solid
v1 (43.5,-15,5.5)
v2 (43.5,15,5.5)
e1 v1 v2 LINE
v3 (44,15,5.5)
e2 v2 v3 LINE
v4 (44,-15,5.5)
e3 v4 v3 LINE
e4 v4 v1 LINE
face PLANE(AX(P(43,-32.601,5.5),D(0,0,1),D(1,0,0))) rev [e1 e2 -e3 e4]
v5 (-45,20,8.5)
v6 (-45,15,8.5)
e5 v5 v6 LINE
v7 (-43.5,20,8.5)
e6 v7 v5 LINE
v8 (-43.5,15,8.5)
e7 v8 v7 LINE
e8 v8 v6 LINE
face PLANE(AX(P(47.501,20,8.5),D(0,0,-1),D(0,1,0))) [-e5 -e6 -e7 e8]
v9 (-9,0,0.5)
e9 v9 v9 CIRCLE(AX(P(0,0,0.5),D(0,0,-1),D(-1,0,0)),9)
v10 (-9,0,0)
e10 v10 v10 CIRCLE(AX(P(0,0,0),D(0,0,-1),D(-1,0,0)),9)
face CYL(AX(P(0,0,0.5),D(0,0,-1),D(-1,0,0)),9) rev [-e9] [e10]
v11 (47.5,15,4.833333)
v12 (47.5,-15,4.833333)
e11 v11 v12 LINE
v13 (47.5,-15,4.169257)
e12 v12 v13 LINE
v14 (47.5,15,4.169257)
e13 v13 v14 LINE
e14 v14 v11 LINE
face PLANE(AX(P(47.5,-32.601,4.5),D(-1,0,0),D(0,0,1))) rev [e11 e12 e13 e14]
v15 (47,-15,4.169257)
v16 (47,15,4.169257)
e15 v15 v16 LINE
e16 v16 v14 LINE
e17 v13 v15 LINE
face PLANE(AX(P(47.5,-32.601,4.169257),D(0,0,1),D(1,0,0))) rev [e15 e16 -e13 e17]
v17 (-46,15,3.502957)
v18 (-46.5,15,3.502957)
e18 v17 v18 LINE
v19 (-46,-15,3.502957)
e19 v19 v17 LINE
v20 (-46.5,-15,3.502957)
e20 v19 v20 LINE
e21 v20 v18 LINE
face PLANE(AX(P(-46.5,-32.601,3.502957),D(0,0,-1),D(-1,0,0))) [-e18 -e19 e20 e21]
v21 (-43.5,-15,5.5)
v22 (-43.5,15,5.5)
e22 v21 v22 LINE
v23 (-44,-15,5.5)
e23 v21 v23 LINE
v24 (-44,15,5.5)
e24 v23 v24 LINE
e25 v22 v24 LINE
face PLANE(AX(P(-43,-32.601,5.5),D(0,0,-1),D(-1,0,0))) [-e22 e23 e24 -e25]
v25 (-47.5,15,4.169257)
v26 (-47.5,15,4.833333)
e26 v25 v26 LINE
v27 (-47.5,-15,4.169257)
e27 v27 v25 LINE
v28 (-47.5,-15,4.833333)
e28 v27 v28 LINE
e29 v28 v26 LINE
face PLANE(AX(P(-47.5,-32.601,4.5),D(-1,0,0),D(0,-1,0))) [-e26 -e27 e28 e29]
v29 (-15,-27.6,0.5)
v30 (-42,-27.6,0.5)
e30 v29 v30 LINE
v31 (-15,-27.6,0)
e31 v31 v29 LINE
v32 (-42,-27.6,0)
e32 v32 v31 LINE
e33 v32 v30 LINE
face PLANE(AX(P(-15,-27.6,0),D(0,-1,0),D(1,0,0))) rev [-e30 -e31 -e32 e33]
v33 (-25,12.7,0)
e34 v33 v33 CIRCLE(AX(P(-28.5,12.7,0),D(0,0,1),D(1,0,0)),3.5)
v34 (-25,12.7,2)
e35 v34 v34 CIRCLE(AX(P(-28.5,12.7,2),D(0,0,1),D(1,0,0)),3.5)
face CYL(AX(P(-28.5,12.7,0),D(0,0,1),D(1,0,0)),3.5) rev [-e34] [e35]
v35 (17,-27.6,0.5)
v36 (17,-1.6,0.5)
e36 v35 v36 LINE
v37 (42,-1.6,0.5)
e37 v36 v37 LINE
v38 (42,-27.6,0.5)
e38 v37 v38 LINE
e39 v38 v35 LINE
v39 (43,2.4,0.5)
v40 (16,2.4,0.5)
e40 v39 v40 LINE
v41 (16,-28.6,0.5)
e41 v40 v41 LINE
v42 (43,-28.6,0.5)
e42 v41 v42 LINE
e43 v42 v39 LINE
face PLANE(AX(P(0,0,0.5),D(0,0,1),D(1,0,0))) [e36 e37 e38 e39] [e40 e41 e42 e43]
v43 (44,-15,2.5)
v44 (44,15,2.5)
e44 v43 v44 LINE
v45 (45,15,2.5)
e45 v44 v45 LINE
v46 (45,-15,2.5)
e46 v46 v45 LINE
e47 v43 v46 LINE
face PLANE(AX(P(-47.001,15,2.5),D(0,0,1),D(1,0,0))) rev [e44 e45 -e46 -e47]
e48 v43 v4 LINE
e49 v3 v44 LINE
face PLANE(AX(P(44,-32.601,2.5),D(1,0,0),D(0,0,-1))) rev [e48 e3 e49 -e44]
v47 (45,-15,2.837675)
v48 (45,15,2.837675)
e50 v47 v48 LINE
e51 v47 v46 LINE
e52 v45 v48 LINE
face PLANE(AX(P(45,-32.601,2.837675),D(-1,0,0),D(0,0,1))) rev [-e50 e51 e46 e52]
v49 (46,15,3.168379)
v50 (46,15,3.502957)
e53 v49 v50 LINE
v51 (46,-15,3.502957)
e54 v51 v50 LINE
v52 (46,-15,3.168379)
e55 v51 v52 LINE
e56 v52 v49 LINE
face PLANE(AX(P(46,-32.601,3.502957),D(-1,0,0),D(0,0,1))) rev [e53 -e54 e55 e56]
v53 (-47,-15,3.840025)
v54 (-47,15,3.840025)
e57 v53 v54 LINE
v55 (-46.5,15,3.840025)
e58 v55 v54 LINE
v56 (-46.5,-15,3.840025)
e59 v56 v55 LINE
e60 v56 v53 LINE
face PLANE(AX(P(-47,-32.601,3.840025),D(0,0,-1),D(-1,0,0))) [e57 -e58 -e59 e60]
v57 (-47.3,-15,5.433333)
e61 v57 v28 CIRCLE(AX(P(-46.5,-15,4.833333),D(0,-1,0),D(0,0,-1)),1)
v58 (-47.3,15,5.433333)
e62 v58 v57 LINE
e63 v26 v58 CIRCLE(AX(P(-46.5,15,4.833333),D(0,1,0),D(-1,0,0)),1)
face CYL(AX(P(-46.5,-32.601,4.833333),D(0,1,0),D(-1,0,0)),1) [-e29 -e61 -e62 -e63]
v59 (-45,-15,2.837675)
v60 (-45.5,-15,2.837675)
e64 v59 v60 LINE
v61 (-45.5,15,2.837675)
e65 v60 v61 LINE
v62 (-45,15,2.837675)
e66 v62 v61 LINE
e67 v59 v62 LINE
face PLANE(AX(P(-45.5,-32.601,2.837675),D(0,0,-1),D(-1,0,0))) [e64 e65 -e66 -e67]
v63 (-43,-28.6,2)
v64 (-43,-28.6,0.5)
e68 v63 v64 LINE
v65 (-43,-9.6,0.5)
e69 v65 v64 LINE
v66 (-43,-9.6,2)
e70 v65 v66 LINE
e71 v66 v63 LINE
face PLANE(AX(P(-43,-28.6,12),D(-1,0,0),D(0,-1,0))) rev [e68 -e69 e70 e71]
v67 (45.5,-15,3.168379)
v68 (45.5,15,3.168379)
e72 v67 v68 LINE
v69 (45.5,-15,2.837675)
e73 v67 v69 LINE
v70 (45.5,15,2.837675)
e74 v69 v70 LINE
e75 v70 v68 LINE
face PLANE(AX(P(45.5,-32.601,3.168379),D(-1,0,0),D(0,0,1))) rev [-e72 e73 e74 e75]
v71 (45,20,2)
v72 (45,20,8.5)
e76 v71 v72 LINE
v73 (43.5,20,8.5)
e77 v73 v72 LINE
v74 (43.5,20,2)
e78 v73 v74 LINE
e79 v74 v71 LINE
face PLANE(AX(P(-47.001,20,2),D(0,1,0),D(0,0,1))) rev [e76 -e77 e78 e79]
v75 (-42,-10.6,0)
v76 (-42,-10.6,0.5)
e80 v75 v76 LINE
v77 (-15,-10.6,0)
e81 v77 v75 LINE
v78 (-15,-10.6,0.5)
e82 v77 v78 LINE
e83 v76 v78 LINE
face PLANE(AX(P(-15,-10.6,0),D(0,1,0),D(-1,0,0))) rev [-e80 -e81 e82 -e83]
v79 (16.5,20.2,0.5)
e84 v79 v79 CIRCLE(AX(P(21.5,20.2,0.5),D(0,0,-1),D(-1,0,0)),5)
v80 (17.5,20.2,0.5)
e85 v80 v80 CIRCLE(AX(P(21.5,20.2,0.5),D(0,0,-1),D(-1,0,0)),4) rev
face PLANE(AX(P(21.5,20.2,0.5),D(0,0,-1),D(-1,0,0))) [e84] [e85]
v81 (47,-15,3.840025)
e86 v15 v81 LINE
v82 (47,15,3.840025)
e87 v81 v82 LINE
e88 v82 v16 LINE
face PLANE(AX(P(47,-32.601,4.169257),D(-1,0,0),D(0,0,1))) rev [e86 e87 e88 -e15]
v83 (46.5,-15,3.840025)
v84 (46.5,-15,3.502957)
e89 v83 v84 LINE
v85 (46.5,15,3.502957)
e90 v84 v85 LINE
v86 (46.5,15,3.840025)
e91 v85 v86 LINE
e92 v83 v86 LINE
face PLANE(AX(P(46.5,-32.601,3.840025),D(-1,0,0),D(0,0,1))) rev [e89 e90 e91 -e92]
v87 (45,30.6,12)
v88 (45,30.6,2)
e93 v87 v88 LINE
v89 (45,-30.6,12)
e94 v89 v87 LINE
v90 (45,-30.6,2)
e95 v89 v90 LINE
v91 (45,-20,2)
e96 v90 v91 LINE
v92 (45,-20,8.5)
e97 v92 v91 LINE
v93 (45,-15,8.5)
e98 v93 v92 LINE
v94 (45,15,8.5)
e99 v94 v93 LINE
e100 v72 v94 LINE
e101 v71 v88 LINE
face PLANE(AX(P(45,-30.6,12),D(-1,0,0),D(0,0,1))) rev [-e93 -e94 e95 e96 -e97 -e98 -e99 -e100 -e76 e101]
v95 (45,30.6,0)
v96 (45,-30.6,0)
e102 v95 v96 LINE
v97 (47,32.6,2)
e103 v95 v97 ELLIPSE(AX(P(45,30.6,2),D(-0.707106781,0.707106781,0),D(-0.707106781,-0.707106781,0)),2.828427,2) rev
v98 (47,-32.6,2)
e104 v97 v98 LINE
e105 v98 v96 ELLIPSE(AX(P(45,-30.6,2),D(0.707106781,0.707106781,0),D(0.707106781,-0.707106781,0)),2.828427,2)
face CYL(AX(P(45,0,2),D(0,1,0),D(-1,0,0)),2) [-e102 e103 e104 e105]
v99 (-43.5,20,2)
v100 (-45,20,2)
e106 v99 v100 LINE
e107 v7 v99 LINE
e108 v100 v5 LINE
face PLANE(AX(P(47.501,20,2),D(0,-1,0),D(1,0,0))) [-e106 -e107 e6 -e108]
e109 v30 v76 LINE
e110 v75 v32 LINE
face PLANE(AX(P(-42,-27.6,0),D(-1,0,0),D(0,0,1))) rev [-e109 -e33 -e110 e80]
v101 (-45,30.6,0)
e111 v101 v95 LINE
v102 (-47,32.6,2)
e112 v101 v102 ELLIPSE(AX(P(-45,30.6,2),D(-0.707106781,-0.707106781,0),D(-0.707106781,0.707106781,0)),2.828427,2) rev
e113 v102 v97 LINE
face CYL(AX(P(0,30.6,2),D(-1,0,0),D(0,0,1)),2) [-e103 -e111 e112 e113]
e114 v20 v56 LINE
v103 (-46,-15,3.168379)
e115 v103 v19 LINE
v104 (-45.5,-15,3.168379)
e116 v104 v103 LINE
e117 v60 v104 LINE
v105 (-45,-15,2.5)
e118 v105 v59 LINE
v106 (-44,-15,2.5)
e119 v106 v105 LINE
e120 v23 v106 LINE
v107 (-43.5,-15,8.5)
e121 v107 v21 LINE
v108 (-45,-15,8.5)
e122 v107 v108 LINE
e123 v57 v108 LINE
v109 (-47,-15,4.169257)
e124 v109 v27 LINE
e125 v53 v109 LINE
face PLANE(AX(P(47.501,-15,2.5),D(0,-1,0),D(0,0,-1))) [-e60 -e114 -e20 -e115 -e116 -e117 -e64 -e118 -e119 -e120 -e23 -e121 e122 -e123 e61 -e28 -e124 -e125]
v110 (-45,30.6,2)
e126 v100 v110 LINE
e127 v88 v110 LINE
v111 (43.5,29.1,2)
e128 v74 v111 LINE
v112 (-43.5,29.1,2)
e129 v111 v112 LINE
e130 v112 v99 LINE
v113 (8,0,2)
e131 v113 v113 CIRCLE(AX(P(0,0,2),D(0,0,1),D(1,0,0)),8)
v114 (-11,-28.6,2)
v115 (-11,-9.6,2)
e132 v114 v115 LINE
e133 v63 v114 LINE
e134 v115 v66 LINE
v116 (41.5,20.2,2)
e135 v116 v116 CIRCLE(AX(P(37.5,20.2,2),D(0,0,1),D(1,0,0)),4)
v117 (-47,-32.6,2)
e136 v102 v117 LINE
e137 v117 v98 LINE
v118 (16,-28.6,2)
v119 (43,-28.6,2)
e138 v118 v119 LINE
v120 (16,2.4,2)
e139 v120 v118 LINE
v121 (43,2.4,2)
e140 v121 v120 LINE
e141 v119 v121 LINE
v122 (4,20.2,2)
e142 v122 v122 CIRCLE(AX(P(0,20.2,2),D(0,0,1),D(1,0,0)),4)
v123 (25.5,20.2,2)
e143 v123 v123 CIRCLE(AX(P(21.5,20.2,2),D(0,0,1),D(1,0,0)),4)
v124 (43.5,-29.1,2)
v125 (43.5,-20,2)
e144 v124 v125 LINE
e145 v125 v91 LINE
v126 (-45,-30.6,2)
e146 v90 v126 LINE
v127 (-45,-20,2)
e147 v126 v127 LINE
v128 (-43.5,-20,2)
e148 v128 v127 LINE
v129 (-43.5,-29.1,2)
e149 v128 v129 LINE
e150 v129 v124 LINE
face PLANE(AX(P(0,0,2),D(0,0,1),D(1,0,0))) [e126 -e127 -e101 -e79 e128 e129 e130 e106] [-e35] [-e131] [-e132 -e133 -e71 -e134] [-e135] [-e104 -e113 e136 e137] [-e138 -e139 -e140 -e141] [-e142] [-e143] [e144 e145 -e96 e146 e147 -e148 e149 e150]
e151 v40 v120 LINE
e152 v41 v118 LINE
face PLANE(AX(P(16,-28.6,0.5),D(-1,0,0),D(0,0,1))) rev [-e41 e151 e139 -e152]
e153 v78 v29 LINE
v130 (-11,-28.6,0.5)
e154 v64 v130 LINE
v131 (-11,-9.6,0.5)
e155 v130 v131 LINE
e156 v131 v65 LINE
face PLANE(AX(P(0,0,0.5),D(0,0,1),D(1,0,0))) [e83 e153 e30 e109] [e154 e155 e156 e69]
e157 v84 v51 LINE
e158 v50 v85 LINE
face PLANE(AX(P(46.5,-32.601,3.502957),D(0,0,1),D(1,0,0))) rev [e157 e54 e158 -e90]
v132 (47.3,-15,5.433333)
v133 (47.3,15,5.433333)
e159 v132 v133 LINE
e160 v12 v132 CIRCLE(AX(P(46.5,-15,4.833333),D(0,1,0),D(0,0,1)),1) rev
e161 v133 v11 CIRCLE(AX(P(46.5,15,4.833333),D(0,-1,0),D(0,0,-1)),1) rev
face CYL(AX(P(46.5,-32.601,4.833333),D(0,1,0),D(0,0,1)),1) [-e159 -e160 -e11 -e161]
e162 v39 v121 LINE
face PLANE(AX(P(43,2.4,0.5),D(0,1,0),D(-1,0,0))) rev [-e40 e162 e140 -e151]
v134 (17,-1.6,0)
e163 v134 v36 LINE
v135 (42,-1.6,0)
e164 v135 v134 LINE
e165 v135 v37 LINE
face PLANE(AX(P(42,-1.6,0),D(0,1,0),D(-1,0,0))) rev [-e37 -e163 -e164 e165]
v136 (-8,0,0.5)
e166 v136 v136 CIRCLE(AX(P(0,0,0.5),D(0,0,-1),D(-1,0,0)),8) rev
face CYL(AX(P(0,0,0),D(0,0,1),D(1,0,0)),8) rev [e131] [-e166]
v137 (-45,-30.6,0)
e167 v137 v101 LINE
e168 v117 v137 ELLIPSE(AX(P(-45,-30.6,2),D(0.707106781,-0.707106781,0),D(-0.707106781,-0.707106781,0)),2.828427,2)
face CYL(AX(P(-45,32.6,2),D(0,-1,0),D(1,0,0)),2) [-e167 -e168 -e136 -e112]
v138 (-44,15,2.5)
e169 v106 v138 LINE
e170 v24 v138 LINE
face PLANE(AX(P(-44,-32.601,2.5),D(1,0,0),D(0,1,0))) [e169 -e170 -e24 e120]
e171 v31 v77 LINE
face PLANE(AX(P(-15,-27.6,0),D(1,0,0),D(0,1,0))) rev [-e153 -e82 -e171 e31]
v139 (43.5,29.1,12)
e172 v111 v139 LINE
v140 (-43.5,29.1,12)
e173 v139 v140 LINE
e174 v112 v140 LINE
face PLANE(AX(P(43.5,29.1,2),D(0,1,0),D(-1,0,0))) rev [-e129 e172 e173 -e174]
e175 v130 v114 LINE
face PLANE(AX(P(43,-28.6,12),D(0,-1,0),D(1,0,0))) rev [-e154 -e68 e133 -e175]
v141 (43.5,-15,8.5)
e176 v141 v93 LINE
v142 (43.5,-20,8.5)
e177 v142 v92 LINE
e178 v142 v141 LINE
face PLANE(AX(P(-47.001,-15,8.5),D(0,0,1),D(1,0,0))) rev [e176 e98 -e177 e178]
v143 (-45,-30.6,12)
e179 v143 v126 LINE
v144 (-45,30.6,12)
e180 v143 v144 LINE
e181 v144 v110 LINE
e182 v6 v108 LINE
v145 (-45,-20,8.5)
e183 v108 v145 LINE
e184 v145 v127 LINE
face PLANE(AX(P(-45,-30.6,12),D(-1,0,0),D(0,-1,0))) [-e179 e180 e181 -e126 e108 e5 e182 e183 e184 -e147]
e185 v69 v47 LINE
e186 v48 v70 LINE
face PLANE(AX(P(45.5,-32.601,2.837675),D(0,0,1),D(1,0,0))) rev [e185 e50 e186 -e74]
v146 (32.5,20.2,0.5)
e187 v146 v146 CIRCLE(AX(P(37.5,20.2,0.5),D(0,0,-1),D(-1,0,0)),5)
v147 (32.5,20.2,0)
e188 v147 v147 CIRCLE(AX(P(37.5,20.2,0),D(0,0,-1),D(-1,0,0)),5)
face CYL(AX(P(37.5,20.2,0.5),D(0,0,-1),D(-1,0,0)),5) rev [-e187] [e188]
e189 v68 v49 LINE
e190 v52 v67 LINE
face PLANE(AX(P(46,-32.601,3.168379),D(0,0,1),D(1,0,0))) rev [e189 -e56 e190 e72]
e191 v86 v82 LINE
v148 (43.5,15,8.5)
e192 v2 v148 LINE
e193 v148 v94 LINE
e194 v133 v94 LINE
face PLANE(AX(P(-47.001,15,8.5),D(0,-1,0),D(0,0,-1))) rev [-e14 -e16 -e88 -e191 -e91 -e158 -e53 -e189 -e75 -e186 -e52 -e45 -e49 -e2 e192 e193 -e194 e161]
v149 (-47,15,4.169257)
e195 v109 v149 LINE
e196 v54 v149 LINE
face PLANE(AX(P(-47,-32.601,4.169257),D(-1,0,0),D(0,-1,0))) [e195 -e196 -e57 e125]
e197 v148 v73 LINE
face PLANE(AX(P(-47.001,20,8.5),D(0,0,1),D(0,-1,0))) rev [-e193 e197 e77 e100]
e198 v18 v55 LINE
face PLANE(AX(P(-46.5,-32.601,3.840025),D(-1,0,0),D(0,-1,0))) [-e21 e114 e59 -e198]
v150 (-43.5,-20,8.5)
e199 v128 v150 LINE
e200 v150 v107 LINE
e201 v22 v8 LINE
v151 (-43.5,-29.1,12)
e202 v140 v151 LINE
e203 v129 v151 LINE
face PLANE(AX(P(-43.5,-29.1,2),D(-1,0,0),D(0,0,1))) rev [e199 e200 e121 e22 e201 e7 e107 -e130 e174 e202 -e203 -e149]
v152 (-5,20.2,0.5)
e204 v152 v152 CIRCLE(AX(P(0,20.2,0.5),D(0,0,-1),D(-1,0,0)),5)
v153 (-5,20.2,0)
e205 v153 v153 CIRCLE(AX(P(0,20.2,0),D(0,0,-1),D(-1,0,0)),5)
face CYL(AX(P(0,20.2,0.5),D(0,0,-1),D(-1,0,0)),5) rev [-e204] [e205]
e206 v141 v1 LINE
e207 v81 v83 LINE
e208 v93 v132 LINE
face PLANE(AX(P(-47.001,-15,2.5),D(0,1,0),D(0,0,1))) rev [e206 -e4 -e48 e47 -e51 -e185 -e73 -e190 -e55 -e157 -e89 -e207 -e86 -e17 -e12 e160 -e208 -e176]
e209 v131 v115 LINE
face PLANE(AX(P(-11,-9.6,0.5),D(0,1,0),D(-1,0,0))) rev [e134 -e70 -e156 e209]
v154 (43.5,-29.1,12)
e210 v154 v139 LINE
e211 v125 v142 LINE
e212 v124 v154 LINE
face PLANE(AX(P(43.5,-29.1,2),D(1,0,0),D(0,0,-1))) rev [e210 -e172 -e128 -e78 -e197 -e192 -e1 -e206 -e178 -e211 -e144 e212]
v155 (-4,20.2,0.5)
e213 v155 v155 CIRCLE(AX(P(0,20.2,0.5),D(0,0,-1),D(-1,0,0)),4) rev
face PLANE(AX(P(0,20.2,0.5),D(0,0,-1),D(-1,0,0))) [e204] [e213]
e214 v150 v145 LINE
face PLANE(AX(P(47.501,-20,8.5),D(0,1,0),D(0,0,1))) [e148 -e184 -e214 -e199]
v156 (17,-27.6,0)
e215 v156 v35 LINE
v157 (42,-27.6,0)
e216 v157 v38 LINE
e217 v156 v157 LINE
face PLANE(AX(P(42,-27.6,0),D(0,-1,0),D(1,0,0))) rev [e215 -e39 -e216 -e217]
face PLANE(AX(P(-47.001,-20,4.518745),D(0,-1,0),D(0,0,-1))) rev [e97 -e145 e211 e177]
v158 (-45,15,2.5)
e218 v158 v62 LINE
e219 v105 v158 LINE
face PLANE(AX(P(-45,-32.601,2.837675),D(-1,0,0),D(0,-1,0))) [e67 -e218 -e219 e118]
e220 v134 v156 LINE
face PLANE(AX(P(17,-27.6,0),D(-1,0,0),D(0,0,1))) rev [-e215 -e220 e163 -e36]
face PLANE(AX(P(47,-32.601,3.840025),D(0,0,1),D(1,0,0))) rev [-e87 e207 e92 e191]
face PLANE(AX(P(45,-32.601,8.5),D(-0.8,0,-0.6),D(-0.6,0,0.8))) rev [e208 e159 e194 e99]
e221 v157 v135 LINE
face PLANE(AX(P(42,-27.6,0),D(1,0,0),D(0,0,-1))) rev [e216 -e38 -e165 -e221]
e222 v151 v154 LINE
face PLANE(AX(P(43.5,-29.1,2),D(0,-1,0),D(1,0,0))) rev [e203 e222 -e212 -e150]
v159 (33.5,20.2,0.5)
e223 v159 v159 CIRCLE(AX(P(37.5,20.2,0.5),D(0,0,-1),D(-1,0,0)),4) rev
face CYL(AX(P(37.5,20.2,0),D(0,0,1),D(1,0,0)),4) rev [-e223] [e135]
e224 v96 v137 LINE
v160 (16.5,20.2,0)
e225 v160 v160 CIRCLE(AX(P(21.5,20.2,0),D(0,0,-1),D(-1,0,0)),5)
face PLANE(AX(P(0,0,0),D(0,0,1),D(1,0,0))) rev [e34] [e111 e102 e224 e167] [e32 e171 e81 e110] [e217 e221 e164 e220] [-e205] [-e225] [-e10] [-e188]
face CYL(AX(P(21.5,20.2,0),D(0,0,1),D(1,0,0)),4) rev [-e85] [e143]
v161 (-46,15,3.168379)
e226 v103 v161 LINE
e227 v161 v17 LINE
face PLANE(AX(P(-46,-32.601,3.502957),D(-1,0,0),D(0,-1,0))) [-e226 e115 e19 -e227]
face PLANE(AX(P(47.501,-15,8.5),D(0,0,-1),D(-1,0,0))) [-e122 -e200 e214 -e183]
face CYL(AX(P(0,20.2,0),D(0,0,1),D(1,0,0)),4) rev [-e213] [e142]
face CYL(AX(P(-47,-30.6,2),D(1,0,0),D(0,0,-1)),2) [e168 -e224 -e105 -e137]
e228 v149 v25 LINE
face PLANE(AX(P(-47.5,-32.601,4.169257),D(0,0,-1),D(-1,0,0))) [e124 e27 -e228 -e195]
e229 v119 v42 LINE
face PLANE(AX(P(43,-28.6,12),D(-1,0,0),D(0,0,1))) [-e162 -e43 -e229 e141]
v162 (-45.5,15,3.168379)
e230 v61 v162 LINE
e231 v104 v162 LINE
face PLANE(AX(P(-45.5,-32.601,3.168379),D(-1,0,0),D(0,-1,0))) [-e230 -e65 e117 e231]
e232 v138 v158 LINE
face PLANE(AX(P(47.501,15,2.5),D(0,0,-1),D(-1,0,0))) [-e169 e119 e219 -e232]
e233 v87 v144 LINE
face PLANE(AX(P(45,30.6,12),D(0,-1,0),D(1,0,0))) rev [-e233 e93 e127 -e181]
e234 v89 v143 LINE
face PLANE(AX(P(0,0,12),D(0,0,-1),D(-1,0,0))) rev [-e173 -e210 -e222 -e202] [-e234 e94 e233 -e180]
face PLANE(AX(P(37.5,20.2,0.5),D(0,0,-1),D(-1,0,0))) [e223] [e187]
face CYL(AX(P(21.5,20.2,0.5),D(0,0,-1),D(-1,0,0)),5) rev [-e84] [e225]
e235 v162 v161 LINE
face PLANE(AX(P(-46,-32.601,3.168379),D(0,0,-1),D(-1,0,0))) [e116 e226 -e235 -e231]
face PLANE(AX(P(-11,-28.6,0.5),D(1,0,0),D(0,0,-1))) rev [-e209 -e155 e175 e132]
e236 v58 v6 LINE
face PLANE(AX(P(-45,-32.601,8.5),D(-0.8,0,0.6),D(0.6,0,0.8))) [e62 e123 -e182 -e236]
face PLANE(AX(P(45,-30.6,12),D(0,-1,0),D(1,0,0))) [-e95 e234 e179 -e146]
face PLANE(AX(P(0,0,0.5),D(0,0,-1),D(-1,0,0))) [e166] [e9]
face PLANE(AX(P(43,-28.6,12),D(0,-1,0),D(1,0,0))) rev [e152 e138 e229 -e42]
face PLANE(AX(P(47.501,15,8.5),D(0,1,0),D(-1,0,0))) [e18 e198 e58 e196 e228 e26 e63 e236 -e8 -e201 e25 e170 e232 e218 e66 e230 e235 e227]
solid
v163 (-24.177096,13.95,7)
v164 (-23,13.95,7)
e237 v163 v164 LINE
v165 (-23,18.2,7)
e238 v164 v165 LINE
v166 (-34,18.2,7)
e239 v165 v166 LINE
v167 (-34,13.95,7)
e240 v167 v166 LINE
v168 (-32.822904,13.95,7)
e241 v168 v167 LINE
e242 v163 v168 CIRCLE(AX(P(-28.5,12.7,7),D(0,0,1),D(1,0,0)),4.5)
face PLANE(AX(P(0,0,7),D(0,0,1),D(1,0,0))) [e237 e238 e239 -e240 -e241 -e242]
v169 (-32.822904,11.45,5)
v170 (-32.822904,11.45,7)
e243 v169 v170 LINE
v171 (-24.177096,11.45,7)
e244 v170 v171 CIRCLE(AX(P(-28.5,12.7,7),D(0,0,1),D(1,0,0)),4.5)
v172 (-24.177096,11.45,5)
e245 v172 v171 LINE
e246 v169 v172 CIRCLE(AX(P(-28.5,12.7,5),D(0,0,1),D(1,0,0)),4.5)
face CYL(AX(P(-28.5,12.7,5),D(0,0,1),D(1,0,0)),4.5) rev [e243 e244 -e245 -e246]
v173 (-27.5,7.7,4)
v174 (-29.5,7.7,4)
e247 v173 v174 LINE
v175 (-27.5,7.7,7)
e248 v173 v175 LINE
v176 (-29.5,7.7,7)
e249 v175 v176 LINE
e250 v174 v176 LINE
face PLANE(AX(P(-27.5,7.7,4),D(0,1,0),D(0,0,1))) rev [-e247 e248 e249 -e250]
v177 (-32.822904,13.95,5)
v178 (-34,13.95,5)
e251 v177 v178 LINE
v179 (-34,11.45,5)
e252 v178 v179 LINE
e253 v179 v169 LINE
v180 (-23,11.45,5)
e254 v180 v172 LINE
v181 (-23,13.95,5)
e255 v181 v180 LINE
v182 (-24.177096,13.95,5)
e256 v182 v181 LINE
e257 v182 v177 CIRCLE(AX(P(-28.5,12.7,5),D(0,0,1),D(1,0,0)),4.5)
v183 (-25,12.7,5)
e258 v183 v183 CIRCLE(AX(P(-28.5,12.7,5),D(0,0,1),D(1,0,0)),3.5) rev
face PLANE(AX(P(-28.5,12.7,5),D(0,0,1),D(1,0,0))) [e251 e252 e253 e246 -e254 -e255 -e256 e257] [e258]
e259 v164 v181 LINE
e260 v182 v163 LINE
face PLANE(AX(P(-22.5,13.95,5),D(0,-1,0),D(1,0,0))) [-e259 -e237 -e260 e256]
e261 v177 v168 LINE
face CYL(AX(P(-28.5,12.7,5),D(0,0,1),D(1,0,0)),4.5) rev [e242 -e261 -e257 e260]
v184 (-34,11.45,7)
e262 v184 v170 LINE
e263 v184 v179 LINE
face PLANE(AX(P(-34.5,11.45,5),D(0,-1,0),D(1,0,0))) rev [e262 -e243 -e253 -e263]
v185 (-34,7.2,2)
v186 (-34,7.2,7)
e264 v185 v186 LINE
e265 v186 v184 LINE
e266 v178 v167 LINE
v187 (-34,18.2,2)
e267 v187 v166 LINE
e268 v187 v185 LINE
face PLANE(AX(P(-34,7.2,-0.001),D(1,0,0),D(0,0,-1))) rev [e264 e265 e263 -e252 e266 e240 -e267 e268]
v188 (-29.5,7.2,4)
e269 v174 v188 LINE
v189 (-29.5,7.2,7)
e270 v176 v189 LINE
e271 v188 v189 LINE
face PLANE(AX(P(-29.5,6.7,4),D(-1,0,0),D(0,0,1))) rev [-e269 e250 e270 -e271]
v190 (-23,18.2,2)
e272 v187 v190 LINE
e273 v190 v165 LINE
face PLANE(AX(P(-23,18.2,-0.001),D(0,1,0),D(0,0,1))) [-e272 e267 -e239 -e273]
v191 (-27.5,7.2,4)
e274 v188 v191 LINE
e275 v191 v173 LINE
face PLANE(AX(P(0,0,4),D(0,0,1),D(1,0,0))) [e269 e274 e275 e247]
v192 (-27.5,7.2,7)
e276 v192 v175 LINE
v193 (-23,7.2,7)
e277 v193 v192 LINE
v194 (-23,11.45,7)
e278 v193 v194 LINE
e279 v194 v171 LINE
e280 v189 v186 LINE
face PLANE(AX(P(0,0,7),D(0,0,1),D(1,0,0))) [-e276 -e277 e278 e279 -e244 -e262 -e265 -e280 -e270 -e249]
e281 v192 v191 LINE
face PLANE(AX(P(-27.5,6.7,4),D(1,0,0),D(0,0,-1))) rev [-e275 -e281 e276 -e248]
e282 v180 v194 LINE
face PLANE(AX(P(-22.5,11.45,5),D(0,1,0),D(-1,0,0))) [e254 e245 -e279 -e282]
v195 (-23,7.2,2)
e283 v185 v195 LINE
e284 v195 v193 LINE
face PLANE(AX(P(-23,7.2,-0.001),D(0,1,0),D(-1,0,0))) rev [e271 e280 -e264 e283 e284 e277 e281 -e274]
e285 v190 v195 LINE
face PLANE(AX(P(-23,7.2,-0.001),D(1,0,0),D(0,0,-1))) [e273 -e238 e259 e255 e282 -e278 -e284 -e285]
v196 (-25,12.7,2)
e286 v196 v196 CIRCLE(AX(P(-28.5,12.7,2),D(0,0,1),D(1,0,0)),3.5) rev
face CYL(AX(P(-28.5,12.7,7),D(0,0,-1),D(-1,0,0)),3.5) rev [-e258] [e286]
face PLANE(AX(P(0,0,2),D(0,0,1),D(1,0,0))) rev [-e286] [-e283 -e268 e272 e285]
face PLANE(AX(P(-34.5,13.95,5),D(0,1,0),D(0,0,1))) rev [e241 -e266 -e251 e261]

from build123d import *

# Parameters (mm, degrees)
SKETCH_1_W             = 94
SKETCH_1_H             = 65.2
EXTRUDE_1_DEPTH        = 2
SKETCH_2_R             = 8
SKETCH_2_R_2           = 3.5
SKETCH_2_R_3           = 4
SKETCH_2_W             = 27
SKETCH_2_H             = 17
SKETCH_2_W_2           = 25
SKETCH_2_H_2           = 26
CUT_EXTRUDE_1_DEPTH    = 2
SKETCH_3_W             = 90
SKETCH_3_H             = 61.2
SKETCH_3_W_2           = 86
SKETCH_3_H_2           = 57.2
EXTRUDE_2_DEPTH        = 10
SKETCH_4_R             = 9
SKETCH_4_R_2           = 5
CUT_EXTRUDE_4_DEPTH    = 0.5
SKETCH_5_W             = 27
SKETCH_5_H             = 31
SKETCH_5_W_2           = 32
SKETCH_5_H_2           = 19
CUT_EXTRUDE_5_DEPTH    = 1.5
SKETCH_6_W             = 12
SKETCH_6_H             = 12
SKETCH_6_R             = 3.5
EXTRUDE_4_DEPTH        = 5
SKETCH_7_W             = 2
SKETCH_7_H             = 1
CUT_EXTRUDE_6_DEPTH    = 3
CUT_EXTRUDE_7_DEPTH    = 2
SKETCH_10_W            = 6
SKETCH_10_H            = 30
EXTRUDE_5_DEPTH        = 3
CUT_EXTRUDE_9_DEPTH    = 30
CUT_EXTRUDE_10_DEPTH   = 30
CUT_EXTRUDE_11_DEPTH   = 30
FILLET_1_R             = 1
FILLET_2_R             = 2
FILLET_1_OF_MIRROR_9_R = 1
SKETCH_17_R            = 4.5
CUT_EXTRUDE_13_DEPTH   = 2
SKETCH_18_W            = 1.677095884
SKETCH_18_H            = 2.5
CUT_EXTRUDE_14_DEPTH   = 2
SKETCH_19_W            = 1
SKETCH_19_H            = 3
CUT_EXTRUDE_15_DEPTH   = 30
SKETCH_21_W            = 87
SKETCH_21_H            = 58.2
SKETCH_21_W_2          = 86
SKETCH_21_H_2          = 57.2
CUT_EXTRUDE_27_DEPTH   = 10
CUT_EXTRUDE_START      = -7
SKETCH_24_W            = 12
SKETCH_24_H            = 12
SKETCH_24_W_2          = 11
SKETCH_24_H_2          = 11
CUT_EXTRUDE_28_DEPTH   = 7


with BuildPart() as part:
    # 草图1 → 凸台-拉伸1 (new body)
    with BuildSketch(Plane.XY):
        Rectangle(SKETCH_1_W, SKETCH_1_H)
    extrude(amount=EXTRUDE_1_DEPTH)

    # 草图2 → 切除-拉伸1 (cut)
    with BuildSketch(Plane.XY.offset(2)):
        Circle(SKETCH_2_R)
        with Locations((-28.5, 12.7)):
            Circle(SKETCH_2_R_2)
        with Locations((37.5, 20.2)):
            Circle(SKETCH_2_R_3)
        with Locations((21.5, 20.2)):
            Circle(SKETCH_2_R_3)
        with Locations((0, 20.2)):
            Circle(SKETCH_2_R_3)
        with Locations((-28.5, -19.1)):
            Rectangle(SKETCH_2_W, SKETCH_2_H)
        with Locations((29.5, -14.6)):
            Rectangle(SKETCH_2_W_2, SKETCH_2_H_2)
    extrude(amount=-CUT_EXTRUDE_1_DEPTH, mode=Mode.SUBTRACT)

    # 草图3 → 凸台-拉伸2 (add)
    with BuildSketch(Plane.XY.offset(2)):
        Rectangle(SKETCH_3_W, SKETCH_3_H)
        Rectangle(SKETCH_3_W_2, SKETCH_3_H_2, mode=Mode.SUBTRACT)
    extrude(amount=EXTRUDE_2_DEPTH)

    # 草图4 → 切除-拉伸4 (cut)
    with BuildSketch(Plane(origin=(0, 0, 0), x_dir=(-1, 0, 0), z_dir=(0, 0, -1))):
        Circle(SKETCH_4_R)
        with Locations((0, 20.2)):
            Circle(SKETCH_4_R_2)
        with Locations((-21.5, 20.2)):
            Circle(SKETCH_4_R_2)
        with Locations((-37.5, 20.2)):
            Circle(SKETCH_4_R_2)
    extrude(amount=-CUT_EXTRUDE_4_DEPTH, mode=Mode.SUBTRACT)

    # 草图5 → 切除-拉伸5 (cut)
    with BuildSketch(Plane.XY.offset(2)):
        with Locations((29.5, -13.1)):
            Rectangle(SKETCH_5_W, SKETCH_5_H)
        with Locations((-27, -19.1)):
            Rectangle(SKETCH_5_W_2, SKETCH_5_H_2)
    extrude(amount=-CUT_EXTRUDE_5_DEPTH, mode=Mode.SUBTRACT)

    # 草图9 → 切除-拉伸7 (cut)
    with BuildSketch(Plane(origin=(45, 0, 0), x_dir=(0, 0, -1), z_dir=(1, 0, 0))):
        Polygon((-8.5, 20), (-8.5, 15), (-2.5, 15), (-2.5, -15), (-8.5, -15), (-8.5, -20), (-4.518745162, -20), (-2, -20), (-2, 20), align=None)
    cut_extrude_7 = extrude(amount=-CUT_EXTRUDE_7_DEPTH, mode=Mode.SUBTRACT)

    # 草图10 → 凸台-拉伸5 (add)
    with BuildSketch(Plane(origin=(45, 0, 0), x_dir=(0, 0, -1), z_dir=(1, 0, 0))):
        with Locations((-5.5, 0)):
            Rectangle(SKETCH_10_W, SKETCH_10_H)
    extrude_5 = extrude(amount=EXTRUDE_5_DEPTH)

    # 草图13 → 切除-拉伸9 (cut)
    with BuildSketch(Plane(origin=(0, 15, 0), x_dir=(1, 0, 0), z_dir=(0, 1, 0))):
        Polygon((48, -4.5), (48, -2.5), (45, -2.5), (45, -2.837675063), (45.5, -2.837675063), (45.5, -3.168378765), (46, -3.168378765), (46, -3.502957406), (46.5, -3.502957406), (46.5, -3.840024676), (47, -3.840024676), (47, -4.169256843), (47.5, -4.169256843), (47.5, -4.5), align=None)
    cut_extrude_9 = extrude(amount=-CUT_EXTRUDE_9_DEPTH, mode=Mode.SUBTRACT)

    # 草图14 → 切除-拉伸10 (cut)
    with BuildSketch(Plane(origin=(0, 15, 0), x_dir=(1, 0, 0), z_dir=(0, 1, 0))):
        Polygon((45, -8.5), (48, -4.5), (48, -8.5), align=None)
    cut_extrude_10 = extrude(amount=-CUT_EXTRUDE_10_DEPTH, mode=Mode.SUBTRACT)

    # 草图15 → 切除-拉伸11 (cut)
    with BuildSketch(Plane(origin=(0, 15, 0), x_dir=(1, 0, 0), z_dir=(0, 1, 0))):
        Polygon((47.5, -4.5), (47.5, -5.166666667), (48, -4.5), align=None)
    cut_extrude_11 = extrude(amount=-CUT_EXTRUDE_11_DEPTH, mode=Mode.SUBTRACT)

    # 圆角1
    fillet_1_edges = [part.edges().sort_by_distance(p)[0] for p in [
        (47.5, 0, 5.166666667),
    ]]
    fillet(fillet_1_edges, radius=FILLET_1_R)

    # 圆角2
    fillet_2_edges = [part.edges().sort_by_distance(p)[0] for p in [
        (47, 0, 0),
        (0, -32.6, 0),
        (-47, 0, 0),
        (0, 32.6, 0),
    ]]
    fillet(fillet_2_edges, radius=FILLET_2_R - 0.0001)  # a hair under: the kernel refuses the full size

    # 镜向9: 切除-拉伸7, 凸台-拉伸5, 切除-拉伸9, 切除-拉伸10, 切除-拉伸11 across plane
    add(cut_extrude_7.mirror(Plane(origin=(0, 0, 0), x_dir=(0, 0, 1), z_dir=(1, 0, 0))), mode=Mode.SUBTRACT)
    add(extrude_5.mirror(Plane(origin=(0, 0, 0), x_dir=(0, 0, 1), z_dir=(1, 0, 0))))
    add(cut_extrude_9.mirror(Plane(origin=(0, 0, 0), x_dir=(0, 0, 1), z_dir=(1, 0, 0))), mode=Mode.SUBTRACT)
    add(cut_extrude_10.mirror(Plane(origin=(0, 0, 0), x_dir=(0, 0, 1), z_dir=(1, 0, 0))), mode=Mode.SUBTRACT)
    add(cut_extrude_11.mirror(Plane(origin=(0, 0, 0), x_dir=(0, 0, 1), z_dir=(1, 0, 0))), mode=Mode.SUBTRACT)

    # 圆角1 of 镜向9
    fillet_1_of_mirror_9_edges = [part.edges().sort_by_distance(p)[0] for p in [
        (-47.5, 0, 5.166666667),
    ]]
    fillet(fillet_1_of_mirror_9_edges, radius=FILLET_1_OF_MIRROR_9_R)

    # 草图19 → 切除-拉伸15 (cut)
    with BuildSketch(Plane(origin=(0, 15, 0), x_dir=(1, 0, 0), z_dir=(0, 1, 0))):
        with Locations((43.5, -4)):
            Rectangle(SKETCH_19_W, SKETCH_19_H)
    cut_extrude_15 = extrude(amount=-CUT_EXTRUDE_15_DEPTH, mode=Mode.SUBTRACT)

    # 镜向11: 切除-拉伸15 across plane
    add(cut_extrude_15.mirror(Plane(origin=(0, 0, 0), x_dir=(0, 0, 1), z_dir=(1, 0, 0))), mode=Mode.SUBTRACT)

    # 草图21 → 切除-拉伸27 (cut)
    with BuildSketch(Plane.XY.offset(12)):
        Rectangle(SKETCH_21_W, SKETCH_21_H)
        Rectangle(SKETCH_21_W_2, SKETCH_21_H_2, mode=Mode.SUBTRACT)
    extrude(amount=-CUT_EXTRUDE_27_DEPTH, mode=Mode.SUBTRACT)


with BuildPart() as body_2:
    # 草图6 → 凸台-拉伸4 (new body)
    with BuildSketch(Plane.XY.offset(2)):
        with Locations((-28.5, 12.7)):
            Rectangle(SKETCH_6_W, SKETCH_6_H)
        with Locations((-28.5, 12.7)):
            Circle(SKETCH_6_R, mode=Mode.SUBTRACT)
    extrude(amount=EXTRUDE_4_DEPTH)

    # 草图7 → 切除-拉伸6 (cut)
    with BuildSketch(Plane.XY.offset(7)):
        with Locations((-28.5, 7.2)):
            Rectangle(SKETCH_7_W, SKETCH_7_H)
    extrude(amount=-CUT_EXTRUDE_6_DEPTH, mode=Mode.SUBTRACT)

    # 草图17 → 切除-拉伸13 (cut)
    with BuildSketch(Plane.XY.offset(7)):
        with Locations((-28.5, 12.7)):
            Circle(SKETCH_17_R)
    extrude(amount=-CUT_EXTRUDE_13_DEPTH, mode=Mode.SUBTRACT)

    # 草图18 → 切除-拉伸14 (cut)
    with BuildSketch(Plane.XY.offset(7)):
        with Locations((-33.661452058, 12.7)):
            Rectangle(SKETCH_18_W, SKETCH_18_H)
    cut_extrude_14 = extrude(amount=-CUT_EXTRUDE_14_DEPTH, mode=Mode.SUBTRACT)

    # 镜向10: 切除-拉伸14 across plane
    add(cut_extrude_14.mirror(Plane(origin=(-28.5, 0, 0), x_dir=(0, 0, 1), z_dir=(1, 0, 0))), mode=Mode.SUBTRACT)

    # 草图24 → 切除-拉伸28 (cut)
    with BuildSketch(Plane.XY.offset(7).offset(CUT_EXTRUDE_START)):
        with Locations((-28.5, 12.7)):
            Rectangle(SKETCH_24_W, SKETCH_24_H)
        with Locations((-28.5, 12.7)):
            Rectangle(SKETCH_24_W_2, SKETCH_24_H_2, mode=Mode.SUBTRACT)
    extrude(amount=CUT_EXTRUDE_28_DEPTH, mode=Mode.SUBTRACT)


solid = Compound([part.part, body_2.part])
